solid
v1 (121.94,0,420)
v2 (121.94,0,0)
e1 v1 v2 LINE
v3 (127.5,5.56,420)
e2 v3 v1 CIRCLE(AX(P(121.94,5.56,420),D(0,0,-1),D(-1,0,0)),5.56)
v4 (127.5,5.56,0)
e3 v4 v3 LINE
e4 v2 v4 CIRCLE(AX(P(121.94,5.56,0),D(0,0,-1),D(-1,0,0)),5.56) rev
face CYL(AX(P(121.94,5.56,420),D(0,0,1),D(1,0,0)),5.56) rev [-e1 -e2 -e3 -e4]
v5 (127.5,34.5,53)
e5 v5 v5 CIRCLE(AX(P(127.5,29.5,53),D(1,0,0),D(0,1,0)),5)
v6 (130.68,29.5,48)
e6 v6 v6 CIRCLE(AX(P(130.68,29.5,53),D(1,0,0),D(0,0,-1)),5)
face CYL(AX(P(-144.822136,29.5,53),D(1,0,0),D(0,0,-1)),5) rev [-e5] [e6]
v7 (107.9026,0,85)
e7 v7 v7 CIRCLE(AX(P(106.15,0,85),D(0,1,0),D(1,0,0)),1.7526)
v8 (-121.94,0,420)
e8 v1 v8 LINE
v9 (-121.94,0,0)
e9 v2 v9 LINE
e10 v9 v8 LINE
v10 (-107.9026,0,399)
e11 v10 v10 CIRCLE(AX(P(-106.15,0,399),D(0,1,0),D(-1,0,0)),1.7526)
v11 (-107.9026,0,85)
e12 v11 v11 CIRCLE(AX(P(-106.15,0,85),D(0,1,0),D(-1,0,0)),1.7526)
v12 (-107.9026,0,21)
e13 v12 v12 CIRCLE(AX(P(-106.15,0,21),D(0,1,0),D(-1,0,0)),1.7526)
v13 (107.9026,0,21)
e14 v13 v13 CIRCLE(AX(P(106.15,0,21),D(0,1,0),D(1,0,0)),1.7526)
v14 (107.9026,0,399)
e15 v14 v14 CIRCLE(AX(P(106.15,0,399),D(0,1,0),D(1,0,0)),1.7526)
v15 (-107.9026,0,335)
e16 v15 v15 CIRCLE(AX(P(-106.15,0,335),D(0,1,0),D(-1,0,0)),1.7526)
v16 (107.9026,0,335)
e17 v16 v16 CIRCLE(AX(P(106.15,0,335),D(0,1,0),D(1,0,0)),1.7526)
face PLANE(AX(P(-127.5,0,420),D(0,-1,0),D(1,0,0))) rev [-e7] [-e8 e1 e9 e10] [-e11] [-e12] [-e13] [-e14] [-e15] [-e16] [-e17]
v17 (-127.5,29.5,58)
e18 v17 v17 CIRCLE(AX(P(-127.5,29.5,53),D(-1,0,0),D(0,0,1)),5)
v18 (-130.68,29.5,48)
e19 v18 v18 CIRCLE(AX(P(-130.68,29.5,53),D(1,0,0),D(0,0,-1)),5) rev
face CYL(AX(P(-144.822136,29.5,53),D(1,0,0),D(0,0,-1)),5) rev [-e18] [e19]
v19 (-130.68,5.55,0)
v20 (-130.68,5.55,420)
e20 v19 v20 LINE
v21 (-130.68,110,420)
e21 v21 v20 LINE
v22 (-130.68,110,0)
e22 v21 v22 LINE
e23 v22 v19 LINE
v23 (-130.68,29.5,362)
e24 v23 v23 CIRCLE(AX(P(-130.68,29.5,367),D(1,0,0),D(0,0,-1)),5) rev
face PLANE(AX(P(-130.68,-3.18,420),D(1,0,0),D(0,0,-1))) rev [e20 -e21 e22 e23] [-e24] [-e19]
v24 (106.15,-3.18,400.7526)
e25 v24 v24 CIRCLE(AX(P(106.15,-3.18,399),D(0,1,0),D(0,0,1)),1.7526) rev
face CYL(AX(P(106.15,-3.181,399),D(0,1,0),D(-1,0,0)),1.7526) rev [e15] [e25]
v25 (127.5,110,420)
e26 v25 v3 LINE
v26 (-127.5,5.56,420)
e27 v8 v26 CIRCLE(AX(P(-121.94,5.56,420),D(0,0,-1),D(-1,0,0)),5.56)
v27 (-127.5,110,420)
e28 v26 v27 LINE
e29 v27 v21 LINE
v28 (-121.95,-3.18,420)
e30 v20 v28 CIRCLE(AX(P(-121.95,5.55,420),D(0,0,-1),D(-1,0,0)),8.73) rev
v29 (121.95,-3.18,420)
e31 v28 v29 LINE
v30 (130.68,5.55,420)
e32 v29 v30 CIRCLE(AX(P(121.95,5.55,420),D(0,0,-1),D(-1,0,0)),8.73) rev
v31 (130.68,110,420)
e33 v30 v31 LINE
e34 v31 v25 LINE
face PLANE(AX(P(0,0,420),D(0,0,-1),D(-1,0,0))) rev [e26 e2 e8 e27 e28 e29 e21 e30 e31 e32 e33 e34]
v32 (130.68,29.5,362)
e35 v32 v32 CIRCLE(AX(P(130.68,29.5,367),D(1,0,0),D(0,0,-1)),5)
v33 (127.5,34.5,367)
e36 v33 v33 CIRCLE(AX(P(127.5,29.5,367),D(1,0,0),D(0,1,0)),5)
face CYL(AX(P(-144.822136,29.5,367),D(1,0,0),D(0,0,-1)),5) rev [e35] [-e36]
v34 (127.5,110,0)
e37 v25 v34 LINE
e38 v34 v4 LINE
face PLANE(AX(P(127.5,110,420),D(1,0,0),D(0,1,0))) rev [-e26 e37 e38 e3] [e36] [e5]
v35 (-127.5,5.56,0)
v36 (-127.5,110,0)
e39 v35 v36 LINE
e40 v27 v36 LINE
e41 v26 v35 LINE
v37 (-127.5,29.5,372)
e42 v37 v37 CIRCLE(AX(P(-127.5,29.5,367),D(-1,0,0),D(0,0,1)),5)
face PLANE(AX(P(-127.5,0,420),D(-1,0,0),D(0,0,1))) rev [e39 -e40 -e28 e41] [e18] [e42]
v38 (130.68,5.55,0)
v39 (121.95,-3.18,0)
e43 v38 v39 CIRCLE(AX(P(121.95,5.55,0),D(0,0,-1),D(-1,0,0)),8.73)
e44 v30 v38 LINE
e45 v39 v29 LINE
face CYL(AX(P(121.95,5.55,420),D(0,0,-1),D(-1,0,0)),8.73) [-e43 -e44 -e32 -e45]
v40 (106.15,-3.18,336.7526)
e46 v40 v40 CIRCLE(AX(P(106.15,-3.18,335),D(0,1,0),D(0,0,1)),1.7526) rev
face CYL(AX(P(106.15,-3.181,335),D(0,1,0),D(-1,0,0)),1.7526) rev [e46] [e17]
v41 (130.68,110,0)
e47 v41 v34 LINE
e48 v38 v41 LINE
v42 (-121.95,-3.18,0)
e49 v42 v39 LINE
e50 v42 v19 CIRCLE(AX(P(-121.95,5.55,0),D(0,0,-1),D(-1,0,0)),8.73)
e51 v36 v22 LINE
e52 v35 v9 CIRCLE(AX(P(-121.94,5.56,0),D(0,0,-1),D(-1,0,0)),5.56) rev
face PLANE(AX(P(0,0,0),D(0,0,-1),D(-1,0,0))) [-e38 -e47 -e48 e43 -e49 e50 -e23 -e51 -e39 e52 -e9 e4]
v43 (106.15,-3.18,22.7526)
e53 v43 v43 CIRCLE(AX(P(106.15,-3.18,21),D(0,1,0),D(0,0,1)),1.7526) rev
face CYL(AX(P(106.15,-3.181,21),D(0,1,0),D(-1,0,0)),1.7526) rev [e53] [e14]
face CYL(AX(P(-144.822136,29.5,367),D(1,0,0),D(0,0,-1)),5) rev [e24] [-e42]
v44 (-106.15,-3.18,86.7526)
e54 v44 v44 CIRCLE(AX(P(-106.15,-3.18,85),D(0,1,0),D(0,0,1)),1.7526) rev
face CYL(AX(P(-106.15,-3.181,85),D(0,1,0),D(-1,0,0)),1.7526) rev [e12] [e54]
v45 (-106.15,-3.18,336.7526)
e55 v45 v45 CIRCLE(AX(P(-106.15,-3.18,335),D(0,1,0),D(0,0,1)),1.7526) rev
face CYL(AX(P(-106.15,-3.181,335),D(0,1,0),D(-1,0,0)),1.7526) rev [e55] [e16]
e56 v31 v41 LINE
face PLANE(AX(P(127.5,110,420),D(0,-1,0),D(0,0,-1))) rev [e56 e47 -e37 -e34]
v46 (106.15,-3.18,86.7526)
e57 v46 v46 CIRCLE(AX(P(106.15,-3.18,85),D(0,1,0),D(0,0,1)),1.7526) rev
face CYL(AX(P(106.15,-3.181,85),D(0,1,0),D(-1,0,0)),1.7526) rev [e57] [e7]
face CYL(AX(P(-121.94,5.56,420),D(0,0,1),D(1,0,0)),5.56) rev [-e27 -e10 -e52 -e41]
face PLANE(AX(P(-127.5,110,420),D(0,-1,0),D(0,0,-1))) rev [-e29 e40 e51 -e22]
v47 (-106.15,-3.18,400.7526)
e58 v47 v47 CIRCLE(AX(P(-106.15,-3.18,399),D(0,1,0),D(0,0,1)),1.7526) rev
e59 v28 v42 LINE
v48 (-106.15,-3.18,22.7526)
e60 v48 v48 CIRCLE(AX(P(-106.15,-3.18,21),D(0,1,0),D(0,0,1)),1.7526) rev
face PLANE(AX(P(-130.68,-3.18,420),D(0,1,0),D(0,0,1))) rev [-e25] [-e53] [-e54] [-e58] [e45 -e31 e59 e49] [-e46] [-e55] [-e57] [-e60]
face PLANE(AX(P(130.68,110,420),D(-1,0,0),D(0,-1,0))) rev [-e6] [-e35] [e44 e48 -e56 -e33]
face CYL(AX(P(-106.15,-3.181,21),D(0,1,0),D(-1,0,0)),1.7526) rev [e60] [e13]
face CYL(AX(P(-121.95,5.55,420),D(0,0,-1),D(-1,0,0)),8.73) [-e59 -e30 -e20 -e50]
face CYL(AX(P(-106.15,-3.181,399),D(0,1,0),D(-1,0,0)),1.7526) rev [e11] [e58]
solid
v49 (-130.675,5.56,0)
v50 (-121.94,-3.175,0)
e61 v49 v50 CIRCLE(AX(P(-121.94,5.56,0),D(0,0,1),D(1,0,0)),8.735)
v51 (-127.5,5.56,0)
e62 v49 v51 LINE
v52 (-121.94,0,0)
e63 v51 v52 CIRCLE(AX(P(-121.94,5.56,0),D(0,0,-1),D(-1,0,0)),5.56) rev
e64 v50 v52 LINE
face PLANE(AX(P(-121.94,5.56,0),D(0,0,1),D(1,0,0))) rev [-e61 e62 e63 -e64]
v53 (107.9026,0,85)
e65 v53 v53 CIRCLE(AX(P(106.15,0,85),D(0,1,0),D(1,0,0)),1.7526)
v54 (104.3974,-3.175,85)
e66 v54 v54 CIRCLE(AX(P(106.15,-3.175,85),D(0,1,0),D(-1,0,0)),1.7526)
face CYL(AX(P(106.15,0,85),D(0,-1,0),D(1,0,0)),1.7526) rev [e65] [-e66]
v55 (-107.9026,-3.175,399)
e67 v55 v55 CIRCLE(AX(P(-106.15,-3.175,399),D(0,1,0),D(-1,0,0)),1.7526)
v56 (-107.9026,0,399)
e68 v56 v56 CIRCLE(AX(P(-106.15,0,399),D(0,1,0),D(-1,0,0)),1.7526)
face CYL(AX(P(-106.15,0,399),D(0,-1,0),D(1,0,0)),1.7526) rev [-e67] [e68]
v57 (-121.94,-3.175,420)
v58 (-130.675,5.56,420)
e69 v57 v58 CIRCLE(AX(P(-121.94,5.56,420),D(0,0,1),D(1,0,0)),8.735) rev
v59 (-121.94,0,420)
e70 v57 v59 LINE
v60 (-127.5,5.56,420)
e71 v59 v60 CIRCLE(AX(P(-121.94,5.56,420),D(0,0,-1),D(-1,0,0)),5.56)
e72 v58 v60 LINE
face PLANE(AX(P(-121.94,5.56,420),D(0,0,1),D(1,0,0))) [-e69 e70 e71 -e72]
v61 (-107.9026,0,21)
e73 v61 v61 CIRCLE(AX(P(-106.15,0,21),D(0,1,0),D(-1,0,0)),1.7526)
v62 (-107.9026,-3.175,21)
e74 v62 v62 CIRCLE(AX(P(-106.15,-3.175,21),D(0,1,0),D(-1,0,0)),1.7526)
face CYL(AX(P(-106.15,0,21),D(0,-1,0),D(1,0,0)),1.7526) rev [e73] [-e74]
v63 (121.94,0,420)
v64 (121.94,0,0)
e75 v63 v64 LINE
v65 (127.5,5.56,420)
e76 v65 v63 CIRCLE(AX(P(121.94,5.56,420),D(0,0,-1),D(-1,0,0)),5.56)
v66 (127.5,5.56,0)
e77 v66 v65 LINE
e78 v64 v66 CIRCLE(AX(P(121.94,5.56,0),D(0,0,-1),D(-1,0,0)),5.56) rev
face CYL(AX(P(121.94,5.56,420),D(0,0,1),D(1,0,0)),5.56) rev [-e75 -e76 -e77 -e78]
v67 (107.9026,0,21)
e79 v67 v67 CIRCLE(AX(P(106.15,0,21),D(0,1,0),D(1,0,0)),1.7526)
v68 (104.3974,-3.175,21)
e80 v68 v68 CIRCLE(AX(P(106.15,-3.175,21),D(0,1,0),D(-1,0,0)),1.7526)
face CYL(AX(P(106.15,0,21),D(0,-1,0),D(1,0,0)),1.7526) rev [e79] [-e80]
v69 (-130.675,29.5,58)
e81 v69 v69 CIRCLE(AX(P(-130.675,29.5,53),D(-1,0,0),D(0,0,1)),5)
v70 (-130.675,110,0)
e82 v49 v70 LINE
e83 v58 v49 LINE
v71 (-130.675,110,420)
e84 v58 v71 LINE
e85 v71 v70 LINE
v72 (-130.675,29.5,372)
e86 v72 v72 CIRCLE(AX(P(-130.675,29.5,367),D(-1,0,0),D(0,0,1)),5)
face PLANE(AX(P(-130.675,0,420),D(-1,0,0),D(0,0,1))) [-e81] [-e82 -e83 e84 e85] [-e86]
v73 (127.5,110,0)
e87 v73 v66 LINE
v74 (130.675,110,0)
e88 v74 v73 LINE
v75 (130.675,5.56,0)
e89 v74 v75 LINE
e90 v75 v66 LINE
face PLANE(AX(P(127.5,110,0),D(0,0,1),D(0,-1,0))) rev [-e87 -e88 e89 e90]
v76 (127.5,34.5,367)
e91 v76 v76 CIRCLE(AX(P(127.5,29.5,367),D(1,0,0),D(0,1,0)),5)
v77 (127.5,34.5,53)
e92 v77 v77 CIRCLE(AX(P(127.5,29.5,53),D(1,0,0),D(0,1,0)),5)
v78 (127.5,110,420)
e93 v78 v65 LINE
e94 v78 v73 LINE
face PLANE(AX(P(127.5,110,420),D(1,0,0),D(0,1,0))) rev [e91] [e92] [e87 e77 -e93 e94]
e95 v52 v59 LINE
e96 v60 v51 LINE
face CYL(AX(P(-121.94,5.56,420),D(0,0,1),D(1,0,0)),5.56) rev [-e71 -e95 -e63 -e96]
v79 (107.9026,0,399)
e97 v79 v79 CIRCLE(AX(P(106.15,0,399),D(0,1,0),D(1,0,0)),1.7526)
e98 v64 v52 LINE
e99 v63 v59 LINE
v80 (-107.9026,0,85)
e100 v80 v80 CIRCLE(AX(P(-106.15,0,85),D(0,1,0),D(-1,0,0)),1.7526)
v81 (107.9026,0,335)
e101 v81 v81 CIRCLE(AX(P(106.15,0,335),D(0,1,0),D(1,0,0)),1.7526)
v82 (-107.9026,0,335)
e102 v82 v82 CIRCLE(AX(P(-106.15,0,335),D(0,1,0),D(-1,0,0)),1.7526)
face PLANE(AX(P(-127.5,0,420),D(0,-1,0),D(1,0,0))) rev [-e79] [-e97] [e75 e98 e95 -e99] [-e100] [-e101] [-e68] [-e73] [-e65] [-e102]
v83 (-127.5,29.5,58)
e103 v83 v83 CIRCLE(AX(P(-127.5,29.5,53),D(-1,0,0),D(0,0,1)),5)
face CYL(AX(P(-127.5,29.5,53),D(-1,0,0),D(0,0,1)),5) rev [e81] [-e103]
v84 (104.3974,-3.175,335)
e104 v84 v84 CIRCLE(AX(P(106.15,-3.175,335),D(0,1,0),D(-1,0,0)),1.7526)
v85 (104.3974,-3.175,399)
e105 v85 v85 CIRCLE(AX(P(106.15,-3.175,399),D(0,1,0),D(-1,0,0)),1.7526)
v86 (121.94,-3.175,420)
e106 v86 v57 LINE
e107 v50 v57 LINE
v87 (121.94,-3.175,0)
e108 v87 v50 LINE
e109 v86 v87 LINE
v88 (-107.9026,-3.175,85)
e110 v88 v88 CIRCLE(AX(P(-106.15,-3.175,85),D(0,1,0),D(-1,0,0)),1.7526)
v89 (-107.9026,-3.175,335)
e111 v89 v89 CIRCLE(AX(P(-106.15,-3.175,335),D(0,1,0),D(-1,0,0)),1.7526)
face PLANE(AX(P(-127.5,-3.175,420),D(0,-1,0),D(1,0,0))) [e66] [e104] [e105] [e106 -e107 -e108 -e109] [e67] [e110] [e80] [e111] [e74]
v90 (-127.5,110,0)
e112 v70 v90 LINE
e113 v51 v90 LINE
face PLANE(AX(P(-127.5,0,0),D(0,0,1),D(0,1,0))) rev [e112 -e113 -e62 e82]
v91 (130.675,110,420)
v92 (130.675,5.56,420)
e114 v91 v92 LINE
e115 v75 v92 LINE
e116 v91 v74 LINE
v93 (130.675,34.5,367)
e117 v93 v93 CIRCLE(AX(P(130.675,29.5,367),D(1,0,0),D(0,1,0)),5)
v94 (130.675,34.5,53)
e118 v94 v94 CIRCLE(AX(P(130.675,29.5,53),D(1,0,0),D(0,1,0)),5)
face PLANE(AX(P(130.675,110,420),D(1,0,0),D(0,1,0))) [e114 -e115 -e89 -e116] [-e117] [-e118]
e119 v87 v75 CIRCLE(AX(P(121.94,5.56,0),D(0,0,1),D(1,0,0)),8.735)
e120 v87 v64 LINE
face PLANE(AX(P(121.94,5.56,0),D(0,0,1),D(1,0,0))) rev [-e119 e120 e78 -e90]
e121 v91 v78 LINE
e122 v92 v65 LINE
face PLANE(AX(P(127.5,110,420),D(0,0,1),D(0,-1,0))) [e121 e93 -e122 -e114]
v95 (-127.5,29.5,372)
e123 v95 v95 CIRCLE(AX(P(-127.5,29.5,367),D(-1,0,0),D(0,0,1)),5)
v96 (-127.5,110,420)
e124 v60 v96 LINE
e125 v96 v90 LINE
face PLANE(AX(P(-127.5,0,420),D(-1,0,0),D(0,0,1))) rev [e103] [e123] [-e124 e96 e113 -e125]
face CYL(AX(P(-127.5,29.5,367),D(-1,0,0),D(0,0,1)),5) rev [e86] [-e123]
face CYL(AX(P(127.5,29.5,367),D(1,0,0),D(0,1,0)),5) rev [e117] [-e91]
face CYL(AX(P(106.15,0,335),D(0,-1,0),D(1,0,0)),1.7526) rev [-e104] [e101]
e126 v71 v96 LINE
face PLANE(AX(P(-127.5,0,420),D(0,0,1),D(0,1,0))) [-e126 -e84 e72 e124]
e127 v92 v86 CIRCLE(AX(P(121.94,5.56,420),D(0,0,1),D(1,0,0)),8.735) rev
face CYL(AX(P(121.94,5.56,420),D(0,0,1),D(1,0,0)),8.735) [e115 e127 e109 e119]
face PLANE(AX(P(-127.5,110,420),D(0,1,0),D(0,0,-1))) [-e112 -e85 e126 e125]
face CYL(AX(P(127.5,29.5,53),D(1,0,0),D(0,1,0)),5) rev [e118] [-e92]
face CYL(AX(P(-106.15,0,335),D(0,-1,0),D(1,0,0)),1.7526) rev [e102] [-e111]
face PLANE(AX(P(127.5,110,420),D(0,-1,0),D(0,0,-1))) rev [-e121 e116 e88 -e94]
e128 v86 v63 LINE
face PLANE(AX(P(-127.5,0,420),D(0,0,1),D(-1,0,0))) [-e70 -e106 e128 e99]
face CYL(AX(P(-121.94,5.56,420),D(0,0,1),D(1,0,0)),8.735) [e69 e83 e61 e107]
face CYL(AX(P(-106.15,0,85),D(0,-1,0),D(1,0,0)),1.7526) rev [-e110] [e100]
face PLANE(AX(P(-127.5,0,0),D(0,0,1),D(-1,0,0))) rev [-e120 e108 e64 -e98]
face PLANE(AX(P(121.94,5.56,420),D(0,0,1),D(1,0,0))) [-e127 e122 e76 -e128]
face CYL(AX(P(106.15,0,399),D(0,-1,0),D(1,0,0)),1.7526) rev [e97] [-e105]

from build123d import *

# Parameters (mm, degrees)
BOSS_EXTRUDE1_DEPTH        = 420
INSIDE_FILLET_R            = 5.56
OUTSIDE_FILLET_R           = 8.73
BEARING_HOLES_REACH        = 508.763
SKETCH2_R                  = 5
MOTOR_MOUNT_HOLES_REACH    = 455.406
SKETCH3_R                  = 1.7526
CONVERT_SOLID1_START       = 34.5000001
CONVERT_SOLID1_OUTLINE_W   = 3.175
CONVERT_SOLID1_OUTLINE_H   = 420
CONVERT_SOLID1_DEPTH       = 75.4999999
CONVERT_SOLID1_START_2     = 5.56
CONVERT_SOLID1_2_OUTLINE_W = 3.175
CONVERT_SOLID1_2_OUTLINE_H = 420
CONVERT_SOLID1_2_DEPTH     = 18.9399999
CONVERT_SOLID1_START_3     = -3.175
CONVERT_SOLID1_3_OUTLINE_W = 261.35
CONVERT_SOLID1_3_OUTLINE_H = 420
CONVERT_SOLID1_3_OUTLINE_R = 1.7526
CONVERT_SOLID1_3_DEPTH     = 8.735
CONVERT_SOLID1_START_4     = 24.4999999
CONVERT_SOLID1_4_OUTLINE_W = 3.175
CONVERT_SOLID1_4_OUTLINE_H = 420
CONVERT_SOLID1_4_DEPTH     = 10.0000002
CONVERT_SOLID1_START_5     = -132
CONVERT_SOLID1_5_OUTLINE_R = 5
CONVERT_SOLID1_5_DEPTH     = 264
CONVERT_SOLID1_6_DEPTH     = 420


with BuildPart() as part:
    # Sketch1 → Boss-Extrude1 (new body)
    with BuildSketch(Plane.XY):
        Polygon((127.5, 110), (127.5, 0), (-127.5, 0), (-127.5, 110), (-130.68, 110), (-130.68, -3.18), (130.68, -3.18), (130.68, 110), align=None)
    extrude(amount=BOSS_EXTRUDE1_DEPTH)

    # Inside Fillet
    inside_fillet_edges = [part.edges().sort_by_distance(p)[0] for p in [
        (-127.5, 0, 210),
        (127.5, 0, 210),
    ]]
    fillet(inside_fillet_edges, radius=INSIDE_FILLET_R)

    # Outside Fillet
    outside_fillet_edges = [part.edges().sort_by_distance(p)[0] for p in [
        (130.68, -3.18, 210),
        (-130.68, -3.18, 210),
    ]]
    fillet(outside_fillet_edges, radius=OUTSIDE_FILLET_R)

    # Bearing Holes: up to this face of the body (flat: up to its plane)
    bearing_holes_end = Plane(part.part.faces().sort_by_distance((-130.68, 57.775, 210))[0])
    # Sketch2 → Bearing Holes (cut, up to the picked face)
    with BuildSketch(Plane(origin=(130.68, 0, 0), x_dir=(0, 0, -1), z_dir=(1, 0, 0)), mode=Mode.PRIVATE) as bearing_holes_sk1:
        with Locations((-367, 29.5)):
            Circle(SKETCH2_R)
    bearing_holes_tool1 = split(extrude(bearing_holes_sk1.sketch, amount=-BEARING_HOLES_REACH, mode=Mode.PRIVATE), bisect_by=bearing_holes_end, keep=Keep.BOTH, mode=Mode.PRIVATE)
    # Sketch2 → Bearing Holes (cut, up to the picked face)
    with BuildSketch(Plane(origin=(130.68, 0, 0), x_dir=(0, 0, -1), z_dir=(1, 0, 0)), mode=Mode.PRIVATE) as bearing_holes_sk2:
        with Locations((-53, 29.5)):
            Circle(SKETCH2_R)
    bearing_holes_tool2 = split(extrude(bearing_holes_sk2.sketch, amount=-BEARING_HOLES_REACH, mode=Mode.PRIVATE), bisect_by=bearing_holes_end, keep=Keep.BOTH, mode=Mode.PRIVATE)
    add(bearing_holes_tool1.solids().sort_by(Axis((130.68, 29.5, 367), (-1, 0, 0)))[0], mode=Mode.SUBTRACT)
    add(bearing_holes_tool2.solids().sort_by(Axis((130.68, 29.5, 53), (-1, 0, 0)))[0], mode=Mode.SUBTRACT)

    # Sketch3 → Motor Mount Holes (cut, up to next)
    with BuildSketch(Plane(origin=(0, 0, 0), x_dir=(1, 0, 0), z_dir=(0, 1, 0)), mode=Mode.PRIVATE) as motor_mount_holes_sk1:
        with Locations(Location((-106.15, -335, 0), (0, 0, 180))):
            Circle(SKETCH3_R)
    motor_mount_holes_tool1 = extrude(motor_mount_holes_sk1.sketch, amount=-MOTOR_MOUNT_HOLES_REACH, mode=Mode.PRIVATE) & part.part
    # Sketch3 → Motor Mount Holes (cut, up to next)
    with BuildSketch(Plane(origin=(0, 0, 0), x_dir=(1, 0, 0), z_dir=(0, 1, 0)), mode=Mode.PRIVATE) as motor_mount_holes_sk2:
        with Locations(Location((-106.15, -399, 0), (0, 0, 180))):
            Circle(SKETCH3_R)
    motor_mount_holes_tool2 = extrude(motor_mount_holes_sk2.sketch, amount=-MOTOR_MOUNT_HOLES_REACH, mode=Mode.PRIVATE) & part.part
    # Sketch3 → Motor Mount Holes (cut, up to next)
    with BuildSketch(Plane(origin=(0, 0, 0), x_dir=(1, 0, 0), z_dir=(0, 1, 0)), mode=Mode.PRIVATE) as motor_mount_holes_sk3:
        with Locations(Location((106.15, -399, 0), (0, 0, 270))):
            Circle(SKETCH3_R)
    motor_mount_holes_tool3 = extrude(motor_mount_holes_sk3.sketch, amount=-MOTOR_MOUNT_HOLES_REACH, mode=Mode.PRIVATE) & part.part
    # Sketch3 → Motor Mount Holes (cut, up to next)
    with BuildSketch(Plane(origin=(0, 0, 0), x_dir=(1, 0, 0), z_dir=(0, 1, 0)), mode=Mode.PRIVATE) as motor_mount_holes_sk4:
        with Locations(Location((106.15, -335, 0), (0, 0, 270))):
            Circle(SKETCH3_R)
    motor_mount_holes_tool4 = extrude(motor_mount_holes_sk4.sketch, amount=-MOTOR_MOUNT_HOLES_REACH, mode=Mode.PRIVATE) & part.part
    # Sketch3 → Motor Mount Holes (cut, up to next)
    with BuildSketch(Plane(origin=(0, 0, 0), x_dir=(1, 0, 0), z_dir=(0, 1, 0)), mode=Mode.PRIVATE) as motor_mount_holes_sk5:
        with Locations(Location((-106.15, -85, 0), (0, 0, 180))):
            Circle(SKETCH3_R)
    motor_mount_holes_tool5 = extrude(motor_mount_holes_sk5.sketch, amount=-MOTOR_MOUNT_HOLES_REACH, mode=Mode.PRIVATE) & part.part
    # Sketch3 → Motor Mount Holes (cut, up to next)
    with BuildSketch(Plane(origin=(0, 0, 0), x_dir=(1, 0, 0), z_dir=(0, 1, 0)), mode=Mode.PRIVATE) as motor_mount_holes_sk6:
        with Locations(Location((-106.15, -21, 0), (0, 0, 180))):
            Circle(SKETCH3_R)
    motor_mount_holes_tool6 = extrude(motor_mount_holes_sk6.sketch, amount=-MOTOR_MOUNT_HOLES_REACH, mode=Mode.PRIVATE) & part.part
    # Sketch3 → Motor Mount Holes (cut, up to next)
    with BuildSketch(Plane(origin=(0, 0, 0), x_dir=(1, 0, 0), z_dir=(0, 1, 0)), mode=Mode.PRIVATE) as motor_mount_holes_sk7:
        with Locations(Location((106.15, -21, 0), (0, 0, 270))):
            Circle(SKETCH3_R)
    motor_mount_holes_tool7 = extrude(motor_mount_holes_sk7.sketch, amount=-MOTOR_MOUNT_HOLES_REACH, mode=Mode.PRIVATE) & part.part
    # Sketch3 → Motor Mount Holes (cut, up to next)
    with BuildSketch(Plane(origin=(0, 0, 0), x_dir=(1, 0, 0), z_dir=(0, 1, 0)), mode=Mode.PRIVATE) as motor_mount_holes_sk8:
        with Locations(Location((106.15, -85, 0), (0, 0, 270))):
            Circle(SKETCH3_R)
    motor_mount_holes_tool8 = extrude(motor_mount_holes_sk8.sketch, amount=-MOTOR_MOUNT_HOLES_REACH, mode=Mode.PRIVATE) & part.part
    add(motor_mount_holes_tool1.solids().sort_by_distance((-106.15, 0, 335))[0], mode=Mode.SUBTRACT)
    add(motor_mount_holes_tool2.solids().sort_by_distance((-106.15, 0, 399))[0], mode=Mode.SUBTRACT)
    add(motor_mount_holes_tool3.solids().sort_by_distance((106.15, 0, 399))[0], mode=Mode.SUBTRACT)
    add(motor_mount_holes_tool4.solids().sort_by_distance((106.15, 0, 335))[0], mode=Mode.SUBTRACT)
    add(motor_mount_holes_tool5.solids().sort_by_distance((-106.15, 0, 85))[0], mode=Mode.SUBTRACT)
    add(motor_mount_holes_tool6.solids().sort_by_distance((-106.15, 0, 21))[0], mode=Mode.SUBTRACT)
    add(motor_mount_holes_tool7.solids().sort_by_distance((106.15, 0, 21))[0], mode=Mode.SUBTRACT)
    add(motor_mount_holes_tool8.solids().sort_by_distance((106.15, 0, 85))[0], mode=Mode.SUBTRACT)


with BuildPart() as body_2:
    # Convert-Solid1: read off the stored shape, not the designer's step
    # Convert-Solid1 outline → Convert-Solid1 (new body)
    with BuildSketch(Plane(origin=(0, 0, 0), x_dir=(1, 0, 0), z_dir=(0, 1, 0)).offset(CONVERT_SOLID1_START)):
        with Locations((129.0875, -210)):
            Rectangle(CONVERT_SOLID1_OUTLINE_W, CONVERT_SOLID1_OUTLINE_H)
        with Locations((-129.0875, -210)):
            Rectangle(CONVERT_SOLID1_OUTLINE_W, CONVERT_SOLID1_OUTLINE_H)
    extrude(amount=CONVERT_SOLID1_DEPTH)

    # Convert-Solid1 2 outline → Convert-Solid1 2 (add)
    with BuildSketch(Plane(origin=(0, 0, 0), x_dir=(1, 0, 0), z_dir=(0, 1, 0)).offset(CONVERT_SOLID1_START_2)):
        with Locations((129.0875, -210)):
            Rectangle(CONVERT_SOLID1_2_OUTLINE_W, CONVERT_SOLID1_2_OUTLINE_H)
        with Locations((-129.0875, -210)):
            Rectangle(CONVERT_SOLID1_2_OUTLINE_W, CONVERT_SOLID1_2_OUTLINE_H)
    extrude(amount=CONVERT_SOLID1_2_DEPTH)

    # Convert-Solid1 3 outline → Convert-Solid1 3 (add)
    with BuildSketch(Plane(origin=(0, 0, 0), x_dir=(1, 0, 0), z_dir=(0, 1, 0)).offset(CONVERT_SOLID1_START_3)):
        with Locations((0, -210)):
            Rectangle(CONVERT_SOLID1_3_OUTLINE_W, CONVERT_SOLID1_3_OUTLINE_H)
        with Locations((-106.15, -399)):
            Circle(CONVERT_SOLID1_3_OUTLINE_R, mode=Mode.SUBTRACT)
        with Locations((-106.15, -335)):
            Circle(CONVERT_SOLID1_3_OUTLINE_R, mode=Mode.SUBTRACT)
        with Locations((106.15, -399)):
            Circle(CONVERT_SOLID1_3_OUTLINE_R, mode=Mode.SUBTRACT)
        with Locations((106.15, -335)):
            Circle(CONVERT_SOLID1_3_OUTLINE_R, mode=Mode.SUBTRACT)
        with Locations((-106.15, -85)):
            Circle(CONVERT_SOLID1_3_OUTLINE_R, mode=Mode.SUBTRACT)
        with Locations((-106.15, -21)):
            Circle(CONVERT_SOLID1_3_OUTLINE_R, mode=Mode.SUBTRACT)
        with Locations((106.15, -85)):
            Circle(CONVERT_SOLID1_3_OUTLINE_R, mode=Mode.SUBTRACT)
        with Locations((106.15, -21)):
            Circle(CONVERT_SOLID1_3_OUTLINE_R, mode=Mode.SUBTRACT)
    extrude(amount=CONVERT_SOLID1_3_DEPTH)

    # Convert-Solid1 4 outline → Convert-Solid1 4 (add)
    with BuildSketch(Plane(origin=(0, 0, 0), x_dir=(1, 0, 0), z_dir=(0, 1, 0)).offset(CONVERT_SOLID1_START_4)):
        with Locations((129.0875, -210)):
            Rectangle(CONVERT_SOLID1_4_OUTLINE_W, CONVERT_SOLID1_4_OUTLINE_H)
        with Locations((-129.0875, -210)):
            Rectangle(CONVERT_SOLID1_4_OUTLINE_W, CONVERT_SOLID1_4_OUTLINE_H)
    extrude(amount=CONVERT_SOLID1_4_DEPTH)

    # Convert-Solid1 5 outline → Convert-Solid1 5 (cut)
    with BuildSketch(Plane.YZ.offset(CONVERT_SOLID1_START_5)):
        with Locations((29.5, 367)):
            Circle(CONVERT_SOLID1_5_OUTLINE_R)
        with Locations((29.5, 53)):
            Circle(CONVERT_SOLID1_5_OUTLINE_R)
    extrude(amount=CONVERT_SOLID1_5_DEPTH, mode=Mode.SUBTRACT)

    # Convert-Solid1 6 outline → Convert-Solid1 6 (cut)
    with BuildSketch(Plane.XY):
        with BuildLine():
            Line((127.5, 5.56), (-127.5, 5.56))
            ThreePointArc((-127.5, 5.56), (-125.871513703, 1.628486297), (-121.94, 0))
            Line((-121.94, 0), (121.94, 0))
            ThreePointArc((121.94, 0), (125.871513703, 1.628486297), (127.5, 5.56))
        make_face()
        with BuildLine():
            ThreePointArc((130.675, 5.56), (128.116577734, -0.616577734), (121.94, -3.175))
            Line((121.94, -3.175), (130.675, -3.175))
            Line((130.675, -3.175), (130.675, 5.56))
        make_face()
        with BuildLine():
            ThreePointArc((-121.94, -3.175), (-128.116577734, -0.616577734), (-130.675, 5.56))
            Line((-130.675, 5.56), (-130.675, -3.175))
            Line((-130.675, -3.175), (-121.94, -3.175))
        make_face()
    extrude(amount=CONVERT_SOLID1_6_DEPTH, mode=Mode.SUBTRACT)


solid = Compound([part.part, body_2.part])
